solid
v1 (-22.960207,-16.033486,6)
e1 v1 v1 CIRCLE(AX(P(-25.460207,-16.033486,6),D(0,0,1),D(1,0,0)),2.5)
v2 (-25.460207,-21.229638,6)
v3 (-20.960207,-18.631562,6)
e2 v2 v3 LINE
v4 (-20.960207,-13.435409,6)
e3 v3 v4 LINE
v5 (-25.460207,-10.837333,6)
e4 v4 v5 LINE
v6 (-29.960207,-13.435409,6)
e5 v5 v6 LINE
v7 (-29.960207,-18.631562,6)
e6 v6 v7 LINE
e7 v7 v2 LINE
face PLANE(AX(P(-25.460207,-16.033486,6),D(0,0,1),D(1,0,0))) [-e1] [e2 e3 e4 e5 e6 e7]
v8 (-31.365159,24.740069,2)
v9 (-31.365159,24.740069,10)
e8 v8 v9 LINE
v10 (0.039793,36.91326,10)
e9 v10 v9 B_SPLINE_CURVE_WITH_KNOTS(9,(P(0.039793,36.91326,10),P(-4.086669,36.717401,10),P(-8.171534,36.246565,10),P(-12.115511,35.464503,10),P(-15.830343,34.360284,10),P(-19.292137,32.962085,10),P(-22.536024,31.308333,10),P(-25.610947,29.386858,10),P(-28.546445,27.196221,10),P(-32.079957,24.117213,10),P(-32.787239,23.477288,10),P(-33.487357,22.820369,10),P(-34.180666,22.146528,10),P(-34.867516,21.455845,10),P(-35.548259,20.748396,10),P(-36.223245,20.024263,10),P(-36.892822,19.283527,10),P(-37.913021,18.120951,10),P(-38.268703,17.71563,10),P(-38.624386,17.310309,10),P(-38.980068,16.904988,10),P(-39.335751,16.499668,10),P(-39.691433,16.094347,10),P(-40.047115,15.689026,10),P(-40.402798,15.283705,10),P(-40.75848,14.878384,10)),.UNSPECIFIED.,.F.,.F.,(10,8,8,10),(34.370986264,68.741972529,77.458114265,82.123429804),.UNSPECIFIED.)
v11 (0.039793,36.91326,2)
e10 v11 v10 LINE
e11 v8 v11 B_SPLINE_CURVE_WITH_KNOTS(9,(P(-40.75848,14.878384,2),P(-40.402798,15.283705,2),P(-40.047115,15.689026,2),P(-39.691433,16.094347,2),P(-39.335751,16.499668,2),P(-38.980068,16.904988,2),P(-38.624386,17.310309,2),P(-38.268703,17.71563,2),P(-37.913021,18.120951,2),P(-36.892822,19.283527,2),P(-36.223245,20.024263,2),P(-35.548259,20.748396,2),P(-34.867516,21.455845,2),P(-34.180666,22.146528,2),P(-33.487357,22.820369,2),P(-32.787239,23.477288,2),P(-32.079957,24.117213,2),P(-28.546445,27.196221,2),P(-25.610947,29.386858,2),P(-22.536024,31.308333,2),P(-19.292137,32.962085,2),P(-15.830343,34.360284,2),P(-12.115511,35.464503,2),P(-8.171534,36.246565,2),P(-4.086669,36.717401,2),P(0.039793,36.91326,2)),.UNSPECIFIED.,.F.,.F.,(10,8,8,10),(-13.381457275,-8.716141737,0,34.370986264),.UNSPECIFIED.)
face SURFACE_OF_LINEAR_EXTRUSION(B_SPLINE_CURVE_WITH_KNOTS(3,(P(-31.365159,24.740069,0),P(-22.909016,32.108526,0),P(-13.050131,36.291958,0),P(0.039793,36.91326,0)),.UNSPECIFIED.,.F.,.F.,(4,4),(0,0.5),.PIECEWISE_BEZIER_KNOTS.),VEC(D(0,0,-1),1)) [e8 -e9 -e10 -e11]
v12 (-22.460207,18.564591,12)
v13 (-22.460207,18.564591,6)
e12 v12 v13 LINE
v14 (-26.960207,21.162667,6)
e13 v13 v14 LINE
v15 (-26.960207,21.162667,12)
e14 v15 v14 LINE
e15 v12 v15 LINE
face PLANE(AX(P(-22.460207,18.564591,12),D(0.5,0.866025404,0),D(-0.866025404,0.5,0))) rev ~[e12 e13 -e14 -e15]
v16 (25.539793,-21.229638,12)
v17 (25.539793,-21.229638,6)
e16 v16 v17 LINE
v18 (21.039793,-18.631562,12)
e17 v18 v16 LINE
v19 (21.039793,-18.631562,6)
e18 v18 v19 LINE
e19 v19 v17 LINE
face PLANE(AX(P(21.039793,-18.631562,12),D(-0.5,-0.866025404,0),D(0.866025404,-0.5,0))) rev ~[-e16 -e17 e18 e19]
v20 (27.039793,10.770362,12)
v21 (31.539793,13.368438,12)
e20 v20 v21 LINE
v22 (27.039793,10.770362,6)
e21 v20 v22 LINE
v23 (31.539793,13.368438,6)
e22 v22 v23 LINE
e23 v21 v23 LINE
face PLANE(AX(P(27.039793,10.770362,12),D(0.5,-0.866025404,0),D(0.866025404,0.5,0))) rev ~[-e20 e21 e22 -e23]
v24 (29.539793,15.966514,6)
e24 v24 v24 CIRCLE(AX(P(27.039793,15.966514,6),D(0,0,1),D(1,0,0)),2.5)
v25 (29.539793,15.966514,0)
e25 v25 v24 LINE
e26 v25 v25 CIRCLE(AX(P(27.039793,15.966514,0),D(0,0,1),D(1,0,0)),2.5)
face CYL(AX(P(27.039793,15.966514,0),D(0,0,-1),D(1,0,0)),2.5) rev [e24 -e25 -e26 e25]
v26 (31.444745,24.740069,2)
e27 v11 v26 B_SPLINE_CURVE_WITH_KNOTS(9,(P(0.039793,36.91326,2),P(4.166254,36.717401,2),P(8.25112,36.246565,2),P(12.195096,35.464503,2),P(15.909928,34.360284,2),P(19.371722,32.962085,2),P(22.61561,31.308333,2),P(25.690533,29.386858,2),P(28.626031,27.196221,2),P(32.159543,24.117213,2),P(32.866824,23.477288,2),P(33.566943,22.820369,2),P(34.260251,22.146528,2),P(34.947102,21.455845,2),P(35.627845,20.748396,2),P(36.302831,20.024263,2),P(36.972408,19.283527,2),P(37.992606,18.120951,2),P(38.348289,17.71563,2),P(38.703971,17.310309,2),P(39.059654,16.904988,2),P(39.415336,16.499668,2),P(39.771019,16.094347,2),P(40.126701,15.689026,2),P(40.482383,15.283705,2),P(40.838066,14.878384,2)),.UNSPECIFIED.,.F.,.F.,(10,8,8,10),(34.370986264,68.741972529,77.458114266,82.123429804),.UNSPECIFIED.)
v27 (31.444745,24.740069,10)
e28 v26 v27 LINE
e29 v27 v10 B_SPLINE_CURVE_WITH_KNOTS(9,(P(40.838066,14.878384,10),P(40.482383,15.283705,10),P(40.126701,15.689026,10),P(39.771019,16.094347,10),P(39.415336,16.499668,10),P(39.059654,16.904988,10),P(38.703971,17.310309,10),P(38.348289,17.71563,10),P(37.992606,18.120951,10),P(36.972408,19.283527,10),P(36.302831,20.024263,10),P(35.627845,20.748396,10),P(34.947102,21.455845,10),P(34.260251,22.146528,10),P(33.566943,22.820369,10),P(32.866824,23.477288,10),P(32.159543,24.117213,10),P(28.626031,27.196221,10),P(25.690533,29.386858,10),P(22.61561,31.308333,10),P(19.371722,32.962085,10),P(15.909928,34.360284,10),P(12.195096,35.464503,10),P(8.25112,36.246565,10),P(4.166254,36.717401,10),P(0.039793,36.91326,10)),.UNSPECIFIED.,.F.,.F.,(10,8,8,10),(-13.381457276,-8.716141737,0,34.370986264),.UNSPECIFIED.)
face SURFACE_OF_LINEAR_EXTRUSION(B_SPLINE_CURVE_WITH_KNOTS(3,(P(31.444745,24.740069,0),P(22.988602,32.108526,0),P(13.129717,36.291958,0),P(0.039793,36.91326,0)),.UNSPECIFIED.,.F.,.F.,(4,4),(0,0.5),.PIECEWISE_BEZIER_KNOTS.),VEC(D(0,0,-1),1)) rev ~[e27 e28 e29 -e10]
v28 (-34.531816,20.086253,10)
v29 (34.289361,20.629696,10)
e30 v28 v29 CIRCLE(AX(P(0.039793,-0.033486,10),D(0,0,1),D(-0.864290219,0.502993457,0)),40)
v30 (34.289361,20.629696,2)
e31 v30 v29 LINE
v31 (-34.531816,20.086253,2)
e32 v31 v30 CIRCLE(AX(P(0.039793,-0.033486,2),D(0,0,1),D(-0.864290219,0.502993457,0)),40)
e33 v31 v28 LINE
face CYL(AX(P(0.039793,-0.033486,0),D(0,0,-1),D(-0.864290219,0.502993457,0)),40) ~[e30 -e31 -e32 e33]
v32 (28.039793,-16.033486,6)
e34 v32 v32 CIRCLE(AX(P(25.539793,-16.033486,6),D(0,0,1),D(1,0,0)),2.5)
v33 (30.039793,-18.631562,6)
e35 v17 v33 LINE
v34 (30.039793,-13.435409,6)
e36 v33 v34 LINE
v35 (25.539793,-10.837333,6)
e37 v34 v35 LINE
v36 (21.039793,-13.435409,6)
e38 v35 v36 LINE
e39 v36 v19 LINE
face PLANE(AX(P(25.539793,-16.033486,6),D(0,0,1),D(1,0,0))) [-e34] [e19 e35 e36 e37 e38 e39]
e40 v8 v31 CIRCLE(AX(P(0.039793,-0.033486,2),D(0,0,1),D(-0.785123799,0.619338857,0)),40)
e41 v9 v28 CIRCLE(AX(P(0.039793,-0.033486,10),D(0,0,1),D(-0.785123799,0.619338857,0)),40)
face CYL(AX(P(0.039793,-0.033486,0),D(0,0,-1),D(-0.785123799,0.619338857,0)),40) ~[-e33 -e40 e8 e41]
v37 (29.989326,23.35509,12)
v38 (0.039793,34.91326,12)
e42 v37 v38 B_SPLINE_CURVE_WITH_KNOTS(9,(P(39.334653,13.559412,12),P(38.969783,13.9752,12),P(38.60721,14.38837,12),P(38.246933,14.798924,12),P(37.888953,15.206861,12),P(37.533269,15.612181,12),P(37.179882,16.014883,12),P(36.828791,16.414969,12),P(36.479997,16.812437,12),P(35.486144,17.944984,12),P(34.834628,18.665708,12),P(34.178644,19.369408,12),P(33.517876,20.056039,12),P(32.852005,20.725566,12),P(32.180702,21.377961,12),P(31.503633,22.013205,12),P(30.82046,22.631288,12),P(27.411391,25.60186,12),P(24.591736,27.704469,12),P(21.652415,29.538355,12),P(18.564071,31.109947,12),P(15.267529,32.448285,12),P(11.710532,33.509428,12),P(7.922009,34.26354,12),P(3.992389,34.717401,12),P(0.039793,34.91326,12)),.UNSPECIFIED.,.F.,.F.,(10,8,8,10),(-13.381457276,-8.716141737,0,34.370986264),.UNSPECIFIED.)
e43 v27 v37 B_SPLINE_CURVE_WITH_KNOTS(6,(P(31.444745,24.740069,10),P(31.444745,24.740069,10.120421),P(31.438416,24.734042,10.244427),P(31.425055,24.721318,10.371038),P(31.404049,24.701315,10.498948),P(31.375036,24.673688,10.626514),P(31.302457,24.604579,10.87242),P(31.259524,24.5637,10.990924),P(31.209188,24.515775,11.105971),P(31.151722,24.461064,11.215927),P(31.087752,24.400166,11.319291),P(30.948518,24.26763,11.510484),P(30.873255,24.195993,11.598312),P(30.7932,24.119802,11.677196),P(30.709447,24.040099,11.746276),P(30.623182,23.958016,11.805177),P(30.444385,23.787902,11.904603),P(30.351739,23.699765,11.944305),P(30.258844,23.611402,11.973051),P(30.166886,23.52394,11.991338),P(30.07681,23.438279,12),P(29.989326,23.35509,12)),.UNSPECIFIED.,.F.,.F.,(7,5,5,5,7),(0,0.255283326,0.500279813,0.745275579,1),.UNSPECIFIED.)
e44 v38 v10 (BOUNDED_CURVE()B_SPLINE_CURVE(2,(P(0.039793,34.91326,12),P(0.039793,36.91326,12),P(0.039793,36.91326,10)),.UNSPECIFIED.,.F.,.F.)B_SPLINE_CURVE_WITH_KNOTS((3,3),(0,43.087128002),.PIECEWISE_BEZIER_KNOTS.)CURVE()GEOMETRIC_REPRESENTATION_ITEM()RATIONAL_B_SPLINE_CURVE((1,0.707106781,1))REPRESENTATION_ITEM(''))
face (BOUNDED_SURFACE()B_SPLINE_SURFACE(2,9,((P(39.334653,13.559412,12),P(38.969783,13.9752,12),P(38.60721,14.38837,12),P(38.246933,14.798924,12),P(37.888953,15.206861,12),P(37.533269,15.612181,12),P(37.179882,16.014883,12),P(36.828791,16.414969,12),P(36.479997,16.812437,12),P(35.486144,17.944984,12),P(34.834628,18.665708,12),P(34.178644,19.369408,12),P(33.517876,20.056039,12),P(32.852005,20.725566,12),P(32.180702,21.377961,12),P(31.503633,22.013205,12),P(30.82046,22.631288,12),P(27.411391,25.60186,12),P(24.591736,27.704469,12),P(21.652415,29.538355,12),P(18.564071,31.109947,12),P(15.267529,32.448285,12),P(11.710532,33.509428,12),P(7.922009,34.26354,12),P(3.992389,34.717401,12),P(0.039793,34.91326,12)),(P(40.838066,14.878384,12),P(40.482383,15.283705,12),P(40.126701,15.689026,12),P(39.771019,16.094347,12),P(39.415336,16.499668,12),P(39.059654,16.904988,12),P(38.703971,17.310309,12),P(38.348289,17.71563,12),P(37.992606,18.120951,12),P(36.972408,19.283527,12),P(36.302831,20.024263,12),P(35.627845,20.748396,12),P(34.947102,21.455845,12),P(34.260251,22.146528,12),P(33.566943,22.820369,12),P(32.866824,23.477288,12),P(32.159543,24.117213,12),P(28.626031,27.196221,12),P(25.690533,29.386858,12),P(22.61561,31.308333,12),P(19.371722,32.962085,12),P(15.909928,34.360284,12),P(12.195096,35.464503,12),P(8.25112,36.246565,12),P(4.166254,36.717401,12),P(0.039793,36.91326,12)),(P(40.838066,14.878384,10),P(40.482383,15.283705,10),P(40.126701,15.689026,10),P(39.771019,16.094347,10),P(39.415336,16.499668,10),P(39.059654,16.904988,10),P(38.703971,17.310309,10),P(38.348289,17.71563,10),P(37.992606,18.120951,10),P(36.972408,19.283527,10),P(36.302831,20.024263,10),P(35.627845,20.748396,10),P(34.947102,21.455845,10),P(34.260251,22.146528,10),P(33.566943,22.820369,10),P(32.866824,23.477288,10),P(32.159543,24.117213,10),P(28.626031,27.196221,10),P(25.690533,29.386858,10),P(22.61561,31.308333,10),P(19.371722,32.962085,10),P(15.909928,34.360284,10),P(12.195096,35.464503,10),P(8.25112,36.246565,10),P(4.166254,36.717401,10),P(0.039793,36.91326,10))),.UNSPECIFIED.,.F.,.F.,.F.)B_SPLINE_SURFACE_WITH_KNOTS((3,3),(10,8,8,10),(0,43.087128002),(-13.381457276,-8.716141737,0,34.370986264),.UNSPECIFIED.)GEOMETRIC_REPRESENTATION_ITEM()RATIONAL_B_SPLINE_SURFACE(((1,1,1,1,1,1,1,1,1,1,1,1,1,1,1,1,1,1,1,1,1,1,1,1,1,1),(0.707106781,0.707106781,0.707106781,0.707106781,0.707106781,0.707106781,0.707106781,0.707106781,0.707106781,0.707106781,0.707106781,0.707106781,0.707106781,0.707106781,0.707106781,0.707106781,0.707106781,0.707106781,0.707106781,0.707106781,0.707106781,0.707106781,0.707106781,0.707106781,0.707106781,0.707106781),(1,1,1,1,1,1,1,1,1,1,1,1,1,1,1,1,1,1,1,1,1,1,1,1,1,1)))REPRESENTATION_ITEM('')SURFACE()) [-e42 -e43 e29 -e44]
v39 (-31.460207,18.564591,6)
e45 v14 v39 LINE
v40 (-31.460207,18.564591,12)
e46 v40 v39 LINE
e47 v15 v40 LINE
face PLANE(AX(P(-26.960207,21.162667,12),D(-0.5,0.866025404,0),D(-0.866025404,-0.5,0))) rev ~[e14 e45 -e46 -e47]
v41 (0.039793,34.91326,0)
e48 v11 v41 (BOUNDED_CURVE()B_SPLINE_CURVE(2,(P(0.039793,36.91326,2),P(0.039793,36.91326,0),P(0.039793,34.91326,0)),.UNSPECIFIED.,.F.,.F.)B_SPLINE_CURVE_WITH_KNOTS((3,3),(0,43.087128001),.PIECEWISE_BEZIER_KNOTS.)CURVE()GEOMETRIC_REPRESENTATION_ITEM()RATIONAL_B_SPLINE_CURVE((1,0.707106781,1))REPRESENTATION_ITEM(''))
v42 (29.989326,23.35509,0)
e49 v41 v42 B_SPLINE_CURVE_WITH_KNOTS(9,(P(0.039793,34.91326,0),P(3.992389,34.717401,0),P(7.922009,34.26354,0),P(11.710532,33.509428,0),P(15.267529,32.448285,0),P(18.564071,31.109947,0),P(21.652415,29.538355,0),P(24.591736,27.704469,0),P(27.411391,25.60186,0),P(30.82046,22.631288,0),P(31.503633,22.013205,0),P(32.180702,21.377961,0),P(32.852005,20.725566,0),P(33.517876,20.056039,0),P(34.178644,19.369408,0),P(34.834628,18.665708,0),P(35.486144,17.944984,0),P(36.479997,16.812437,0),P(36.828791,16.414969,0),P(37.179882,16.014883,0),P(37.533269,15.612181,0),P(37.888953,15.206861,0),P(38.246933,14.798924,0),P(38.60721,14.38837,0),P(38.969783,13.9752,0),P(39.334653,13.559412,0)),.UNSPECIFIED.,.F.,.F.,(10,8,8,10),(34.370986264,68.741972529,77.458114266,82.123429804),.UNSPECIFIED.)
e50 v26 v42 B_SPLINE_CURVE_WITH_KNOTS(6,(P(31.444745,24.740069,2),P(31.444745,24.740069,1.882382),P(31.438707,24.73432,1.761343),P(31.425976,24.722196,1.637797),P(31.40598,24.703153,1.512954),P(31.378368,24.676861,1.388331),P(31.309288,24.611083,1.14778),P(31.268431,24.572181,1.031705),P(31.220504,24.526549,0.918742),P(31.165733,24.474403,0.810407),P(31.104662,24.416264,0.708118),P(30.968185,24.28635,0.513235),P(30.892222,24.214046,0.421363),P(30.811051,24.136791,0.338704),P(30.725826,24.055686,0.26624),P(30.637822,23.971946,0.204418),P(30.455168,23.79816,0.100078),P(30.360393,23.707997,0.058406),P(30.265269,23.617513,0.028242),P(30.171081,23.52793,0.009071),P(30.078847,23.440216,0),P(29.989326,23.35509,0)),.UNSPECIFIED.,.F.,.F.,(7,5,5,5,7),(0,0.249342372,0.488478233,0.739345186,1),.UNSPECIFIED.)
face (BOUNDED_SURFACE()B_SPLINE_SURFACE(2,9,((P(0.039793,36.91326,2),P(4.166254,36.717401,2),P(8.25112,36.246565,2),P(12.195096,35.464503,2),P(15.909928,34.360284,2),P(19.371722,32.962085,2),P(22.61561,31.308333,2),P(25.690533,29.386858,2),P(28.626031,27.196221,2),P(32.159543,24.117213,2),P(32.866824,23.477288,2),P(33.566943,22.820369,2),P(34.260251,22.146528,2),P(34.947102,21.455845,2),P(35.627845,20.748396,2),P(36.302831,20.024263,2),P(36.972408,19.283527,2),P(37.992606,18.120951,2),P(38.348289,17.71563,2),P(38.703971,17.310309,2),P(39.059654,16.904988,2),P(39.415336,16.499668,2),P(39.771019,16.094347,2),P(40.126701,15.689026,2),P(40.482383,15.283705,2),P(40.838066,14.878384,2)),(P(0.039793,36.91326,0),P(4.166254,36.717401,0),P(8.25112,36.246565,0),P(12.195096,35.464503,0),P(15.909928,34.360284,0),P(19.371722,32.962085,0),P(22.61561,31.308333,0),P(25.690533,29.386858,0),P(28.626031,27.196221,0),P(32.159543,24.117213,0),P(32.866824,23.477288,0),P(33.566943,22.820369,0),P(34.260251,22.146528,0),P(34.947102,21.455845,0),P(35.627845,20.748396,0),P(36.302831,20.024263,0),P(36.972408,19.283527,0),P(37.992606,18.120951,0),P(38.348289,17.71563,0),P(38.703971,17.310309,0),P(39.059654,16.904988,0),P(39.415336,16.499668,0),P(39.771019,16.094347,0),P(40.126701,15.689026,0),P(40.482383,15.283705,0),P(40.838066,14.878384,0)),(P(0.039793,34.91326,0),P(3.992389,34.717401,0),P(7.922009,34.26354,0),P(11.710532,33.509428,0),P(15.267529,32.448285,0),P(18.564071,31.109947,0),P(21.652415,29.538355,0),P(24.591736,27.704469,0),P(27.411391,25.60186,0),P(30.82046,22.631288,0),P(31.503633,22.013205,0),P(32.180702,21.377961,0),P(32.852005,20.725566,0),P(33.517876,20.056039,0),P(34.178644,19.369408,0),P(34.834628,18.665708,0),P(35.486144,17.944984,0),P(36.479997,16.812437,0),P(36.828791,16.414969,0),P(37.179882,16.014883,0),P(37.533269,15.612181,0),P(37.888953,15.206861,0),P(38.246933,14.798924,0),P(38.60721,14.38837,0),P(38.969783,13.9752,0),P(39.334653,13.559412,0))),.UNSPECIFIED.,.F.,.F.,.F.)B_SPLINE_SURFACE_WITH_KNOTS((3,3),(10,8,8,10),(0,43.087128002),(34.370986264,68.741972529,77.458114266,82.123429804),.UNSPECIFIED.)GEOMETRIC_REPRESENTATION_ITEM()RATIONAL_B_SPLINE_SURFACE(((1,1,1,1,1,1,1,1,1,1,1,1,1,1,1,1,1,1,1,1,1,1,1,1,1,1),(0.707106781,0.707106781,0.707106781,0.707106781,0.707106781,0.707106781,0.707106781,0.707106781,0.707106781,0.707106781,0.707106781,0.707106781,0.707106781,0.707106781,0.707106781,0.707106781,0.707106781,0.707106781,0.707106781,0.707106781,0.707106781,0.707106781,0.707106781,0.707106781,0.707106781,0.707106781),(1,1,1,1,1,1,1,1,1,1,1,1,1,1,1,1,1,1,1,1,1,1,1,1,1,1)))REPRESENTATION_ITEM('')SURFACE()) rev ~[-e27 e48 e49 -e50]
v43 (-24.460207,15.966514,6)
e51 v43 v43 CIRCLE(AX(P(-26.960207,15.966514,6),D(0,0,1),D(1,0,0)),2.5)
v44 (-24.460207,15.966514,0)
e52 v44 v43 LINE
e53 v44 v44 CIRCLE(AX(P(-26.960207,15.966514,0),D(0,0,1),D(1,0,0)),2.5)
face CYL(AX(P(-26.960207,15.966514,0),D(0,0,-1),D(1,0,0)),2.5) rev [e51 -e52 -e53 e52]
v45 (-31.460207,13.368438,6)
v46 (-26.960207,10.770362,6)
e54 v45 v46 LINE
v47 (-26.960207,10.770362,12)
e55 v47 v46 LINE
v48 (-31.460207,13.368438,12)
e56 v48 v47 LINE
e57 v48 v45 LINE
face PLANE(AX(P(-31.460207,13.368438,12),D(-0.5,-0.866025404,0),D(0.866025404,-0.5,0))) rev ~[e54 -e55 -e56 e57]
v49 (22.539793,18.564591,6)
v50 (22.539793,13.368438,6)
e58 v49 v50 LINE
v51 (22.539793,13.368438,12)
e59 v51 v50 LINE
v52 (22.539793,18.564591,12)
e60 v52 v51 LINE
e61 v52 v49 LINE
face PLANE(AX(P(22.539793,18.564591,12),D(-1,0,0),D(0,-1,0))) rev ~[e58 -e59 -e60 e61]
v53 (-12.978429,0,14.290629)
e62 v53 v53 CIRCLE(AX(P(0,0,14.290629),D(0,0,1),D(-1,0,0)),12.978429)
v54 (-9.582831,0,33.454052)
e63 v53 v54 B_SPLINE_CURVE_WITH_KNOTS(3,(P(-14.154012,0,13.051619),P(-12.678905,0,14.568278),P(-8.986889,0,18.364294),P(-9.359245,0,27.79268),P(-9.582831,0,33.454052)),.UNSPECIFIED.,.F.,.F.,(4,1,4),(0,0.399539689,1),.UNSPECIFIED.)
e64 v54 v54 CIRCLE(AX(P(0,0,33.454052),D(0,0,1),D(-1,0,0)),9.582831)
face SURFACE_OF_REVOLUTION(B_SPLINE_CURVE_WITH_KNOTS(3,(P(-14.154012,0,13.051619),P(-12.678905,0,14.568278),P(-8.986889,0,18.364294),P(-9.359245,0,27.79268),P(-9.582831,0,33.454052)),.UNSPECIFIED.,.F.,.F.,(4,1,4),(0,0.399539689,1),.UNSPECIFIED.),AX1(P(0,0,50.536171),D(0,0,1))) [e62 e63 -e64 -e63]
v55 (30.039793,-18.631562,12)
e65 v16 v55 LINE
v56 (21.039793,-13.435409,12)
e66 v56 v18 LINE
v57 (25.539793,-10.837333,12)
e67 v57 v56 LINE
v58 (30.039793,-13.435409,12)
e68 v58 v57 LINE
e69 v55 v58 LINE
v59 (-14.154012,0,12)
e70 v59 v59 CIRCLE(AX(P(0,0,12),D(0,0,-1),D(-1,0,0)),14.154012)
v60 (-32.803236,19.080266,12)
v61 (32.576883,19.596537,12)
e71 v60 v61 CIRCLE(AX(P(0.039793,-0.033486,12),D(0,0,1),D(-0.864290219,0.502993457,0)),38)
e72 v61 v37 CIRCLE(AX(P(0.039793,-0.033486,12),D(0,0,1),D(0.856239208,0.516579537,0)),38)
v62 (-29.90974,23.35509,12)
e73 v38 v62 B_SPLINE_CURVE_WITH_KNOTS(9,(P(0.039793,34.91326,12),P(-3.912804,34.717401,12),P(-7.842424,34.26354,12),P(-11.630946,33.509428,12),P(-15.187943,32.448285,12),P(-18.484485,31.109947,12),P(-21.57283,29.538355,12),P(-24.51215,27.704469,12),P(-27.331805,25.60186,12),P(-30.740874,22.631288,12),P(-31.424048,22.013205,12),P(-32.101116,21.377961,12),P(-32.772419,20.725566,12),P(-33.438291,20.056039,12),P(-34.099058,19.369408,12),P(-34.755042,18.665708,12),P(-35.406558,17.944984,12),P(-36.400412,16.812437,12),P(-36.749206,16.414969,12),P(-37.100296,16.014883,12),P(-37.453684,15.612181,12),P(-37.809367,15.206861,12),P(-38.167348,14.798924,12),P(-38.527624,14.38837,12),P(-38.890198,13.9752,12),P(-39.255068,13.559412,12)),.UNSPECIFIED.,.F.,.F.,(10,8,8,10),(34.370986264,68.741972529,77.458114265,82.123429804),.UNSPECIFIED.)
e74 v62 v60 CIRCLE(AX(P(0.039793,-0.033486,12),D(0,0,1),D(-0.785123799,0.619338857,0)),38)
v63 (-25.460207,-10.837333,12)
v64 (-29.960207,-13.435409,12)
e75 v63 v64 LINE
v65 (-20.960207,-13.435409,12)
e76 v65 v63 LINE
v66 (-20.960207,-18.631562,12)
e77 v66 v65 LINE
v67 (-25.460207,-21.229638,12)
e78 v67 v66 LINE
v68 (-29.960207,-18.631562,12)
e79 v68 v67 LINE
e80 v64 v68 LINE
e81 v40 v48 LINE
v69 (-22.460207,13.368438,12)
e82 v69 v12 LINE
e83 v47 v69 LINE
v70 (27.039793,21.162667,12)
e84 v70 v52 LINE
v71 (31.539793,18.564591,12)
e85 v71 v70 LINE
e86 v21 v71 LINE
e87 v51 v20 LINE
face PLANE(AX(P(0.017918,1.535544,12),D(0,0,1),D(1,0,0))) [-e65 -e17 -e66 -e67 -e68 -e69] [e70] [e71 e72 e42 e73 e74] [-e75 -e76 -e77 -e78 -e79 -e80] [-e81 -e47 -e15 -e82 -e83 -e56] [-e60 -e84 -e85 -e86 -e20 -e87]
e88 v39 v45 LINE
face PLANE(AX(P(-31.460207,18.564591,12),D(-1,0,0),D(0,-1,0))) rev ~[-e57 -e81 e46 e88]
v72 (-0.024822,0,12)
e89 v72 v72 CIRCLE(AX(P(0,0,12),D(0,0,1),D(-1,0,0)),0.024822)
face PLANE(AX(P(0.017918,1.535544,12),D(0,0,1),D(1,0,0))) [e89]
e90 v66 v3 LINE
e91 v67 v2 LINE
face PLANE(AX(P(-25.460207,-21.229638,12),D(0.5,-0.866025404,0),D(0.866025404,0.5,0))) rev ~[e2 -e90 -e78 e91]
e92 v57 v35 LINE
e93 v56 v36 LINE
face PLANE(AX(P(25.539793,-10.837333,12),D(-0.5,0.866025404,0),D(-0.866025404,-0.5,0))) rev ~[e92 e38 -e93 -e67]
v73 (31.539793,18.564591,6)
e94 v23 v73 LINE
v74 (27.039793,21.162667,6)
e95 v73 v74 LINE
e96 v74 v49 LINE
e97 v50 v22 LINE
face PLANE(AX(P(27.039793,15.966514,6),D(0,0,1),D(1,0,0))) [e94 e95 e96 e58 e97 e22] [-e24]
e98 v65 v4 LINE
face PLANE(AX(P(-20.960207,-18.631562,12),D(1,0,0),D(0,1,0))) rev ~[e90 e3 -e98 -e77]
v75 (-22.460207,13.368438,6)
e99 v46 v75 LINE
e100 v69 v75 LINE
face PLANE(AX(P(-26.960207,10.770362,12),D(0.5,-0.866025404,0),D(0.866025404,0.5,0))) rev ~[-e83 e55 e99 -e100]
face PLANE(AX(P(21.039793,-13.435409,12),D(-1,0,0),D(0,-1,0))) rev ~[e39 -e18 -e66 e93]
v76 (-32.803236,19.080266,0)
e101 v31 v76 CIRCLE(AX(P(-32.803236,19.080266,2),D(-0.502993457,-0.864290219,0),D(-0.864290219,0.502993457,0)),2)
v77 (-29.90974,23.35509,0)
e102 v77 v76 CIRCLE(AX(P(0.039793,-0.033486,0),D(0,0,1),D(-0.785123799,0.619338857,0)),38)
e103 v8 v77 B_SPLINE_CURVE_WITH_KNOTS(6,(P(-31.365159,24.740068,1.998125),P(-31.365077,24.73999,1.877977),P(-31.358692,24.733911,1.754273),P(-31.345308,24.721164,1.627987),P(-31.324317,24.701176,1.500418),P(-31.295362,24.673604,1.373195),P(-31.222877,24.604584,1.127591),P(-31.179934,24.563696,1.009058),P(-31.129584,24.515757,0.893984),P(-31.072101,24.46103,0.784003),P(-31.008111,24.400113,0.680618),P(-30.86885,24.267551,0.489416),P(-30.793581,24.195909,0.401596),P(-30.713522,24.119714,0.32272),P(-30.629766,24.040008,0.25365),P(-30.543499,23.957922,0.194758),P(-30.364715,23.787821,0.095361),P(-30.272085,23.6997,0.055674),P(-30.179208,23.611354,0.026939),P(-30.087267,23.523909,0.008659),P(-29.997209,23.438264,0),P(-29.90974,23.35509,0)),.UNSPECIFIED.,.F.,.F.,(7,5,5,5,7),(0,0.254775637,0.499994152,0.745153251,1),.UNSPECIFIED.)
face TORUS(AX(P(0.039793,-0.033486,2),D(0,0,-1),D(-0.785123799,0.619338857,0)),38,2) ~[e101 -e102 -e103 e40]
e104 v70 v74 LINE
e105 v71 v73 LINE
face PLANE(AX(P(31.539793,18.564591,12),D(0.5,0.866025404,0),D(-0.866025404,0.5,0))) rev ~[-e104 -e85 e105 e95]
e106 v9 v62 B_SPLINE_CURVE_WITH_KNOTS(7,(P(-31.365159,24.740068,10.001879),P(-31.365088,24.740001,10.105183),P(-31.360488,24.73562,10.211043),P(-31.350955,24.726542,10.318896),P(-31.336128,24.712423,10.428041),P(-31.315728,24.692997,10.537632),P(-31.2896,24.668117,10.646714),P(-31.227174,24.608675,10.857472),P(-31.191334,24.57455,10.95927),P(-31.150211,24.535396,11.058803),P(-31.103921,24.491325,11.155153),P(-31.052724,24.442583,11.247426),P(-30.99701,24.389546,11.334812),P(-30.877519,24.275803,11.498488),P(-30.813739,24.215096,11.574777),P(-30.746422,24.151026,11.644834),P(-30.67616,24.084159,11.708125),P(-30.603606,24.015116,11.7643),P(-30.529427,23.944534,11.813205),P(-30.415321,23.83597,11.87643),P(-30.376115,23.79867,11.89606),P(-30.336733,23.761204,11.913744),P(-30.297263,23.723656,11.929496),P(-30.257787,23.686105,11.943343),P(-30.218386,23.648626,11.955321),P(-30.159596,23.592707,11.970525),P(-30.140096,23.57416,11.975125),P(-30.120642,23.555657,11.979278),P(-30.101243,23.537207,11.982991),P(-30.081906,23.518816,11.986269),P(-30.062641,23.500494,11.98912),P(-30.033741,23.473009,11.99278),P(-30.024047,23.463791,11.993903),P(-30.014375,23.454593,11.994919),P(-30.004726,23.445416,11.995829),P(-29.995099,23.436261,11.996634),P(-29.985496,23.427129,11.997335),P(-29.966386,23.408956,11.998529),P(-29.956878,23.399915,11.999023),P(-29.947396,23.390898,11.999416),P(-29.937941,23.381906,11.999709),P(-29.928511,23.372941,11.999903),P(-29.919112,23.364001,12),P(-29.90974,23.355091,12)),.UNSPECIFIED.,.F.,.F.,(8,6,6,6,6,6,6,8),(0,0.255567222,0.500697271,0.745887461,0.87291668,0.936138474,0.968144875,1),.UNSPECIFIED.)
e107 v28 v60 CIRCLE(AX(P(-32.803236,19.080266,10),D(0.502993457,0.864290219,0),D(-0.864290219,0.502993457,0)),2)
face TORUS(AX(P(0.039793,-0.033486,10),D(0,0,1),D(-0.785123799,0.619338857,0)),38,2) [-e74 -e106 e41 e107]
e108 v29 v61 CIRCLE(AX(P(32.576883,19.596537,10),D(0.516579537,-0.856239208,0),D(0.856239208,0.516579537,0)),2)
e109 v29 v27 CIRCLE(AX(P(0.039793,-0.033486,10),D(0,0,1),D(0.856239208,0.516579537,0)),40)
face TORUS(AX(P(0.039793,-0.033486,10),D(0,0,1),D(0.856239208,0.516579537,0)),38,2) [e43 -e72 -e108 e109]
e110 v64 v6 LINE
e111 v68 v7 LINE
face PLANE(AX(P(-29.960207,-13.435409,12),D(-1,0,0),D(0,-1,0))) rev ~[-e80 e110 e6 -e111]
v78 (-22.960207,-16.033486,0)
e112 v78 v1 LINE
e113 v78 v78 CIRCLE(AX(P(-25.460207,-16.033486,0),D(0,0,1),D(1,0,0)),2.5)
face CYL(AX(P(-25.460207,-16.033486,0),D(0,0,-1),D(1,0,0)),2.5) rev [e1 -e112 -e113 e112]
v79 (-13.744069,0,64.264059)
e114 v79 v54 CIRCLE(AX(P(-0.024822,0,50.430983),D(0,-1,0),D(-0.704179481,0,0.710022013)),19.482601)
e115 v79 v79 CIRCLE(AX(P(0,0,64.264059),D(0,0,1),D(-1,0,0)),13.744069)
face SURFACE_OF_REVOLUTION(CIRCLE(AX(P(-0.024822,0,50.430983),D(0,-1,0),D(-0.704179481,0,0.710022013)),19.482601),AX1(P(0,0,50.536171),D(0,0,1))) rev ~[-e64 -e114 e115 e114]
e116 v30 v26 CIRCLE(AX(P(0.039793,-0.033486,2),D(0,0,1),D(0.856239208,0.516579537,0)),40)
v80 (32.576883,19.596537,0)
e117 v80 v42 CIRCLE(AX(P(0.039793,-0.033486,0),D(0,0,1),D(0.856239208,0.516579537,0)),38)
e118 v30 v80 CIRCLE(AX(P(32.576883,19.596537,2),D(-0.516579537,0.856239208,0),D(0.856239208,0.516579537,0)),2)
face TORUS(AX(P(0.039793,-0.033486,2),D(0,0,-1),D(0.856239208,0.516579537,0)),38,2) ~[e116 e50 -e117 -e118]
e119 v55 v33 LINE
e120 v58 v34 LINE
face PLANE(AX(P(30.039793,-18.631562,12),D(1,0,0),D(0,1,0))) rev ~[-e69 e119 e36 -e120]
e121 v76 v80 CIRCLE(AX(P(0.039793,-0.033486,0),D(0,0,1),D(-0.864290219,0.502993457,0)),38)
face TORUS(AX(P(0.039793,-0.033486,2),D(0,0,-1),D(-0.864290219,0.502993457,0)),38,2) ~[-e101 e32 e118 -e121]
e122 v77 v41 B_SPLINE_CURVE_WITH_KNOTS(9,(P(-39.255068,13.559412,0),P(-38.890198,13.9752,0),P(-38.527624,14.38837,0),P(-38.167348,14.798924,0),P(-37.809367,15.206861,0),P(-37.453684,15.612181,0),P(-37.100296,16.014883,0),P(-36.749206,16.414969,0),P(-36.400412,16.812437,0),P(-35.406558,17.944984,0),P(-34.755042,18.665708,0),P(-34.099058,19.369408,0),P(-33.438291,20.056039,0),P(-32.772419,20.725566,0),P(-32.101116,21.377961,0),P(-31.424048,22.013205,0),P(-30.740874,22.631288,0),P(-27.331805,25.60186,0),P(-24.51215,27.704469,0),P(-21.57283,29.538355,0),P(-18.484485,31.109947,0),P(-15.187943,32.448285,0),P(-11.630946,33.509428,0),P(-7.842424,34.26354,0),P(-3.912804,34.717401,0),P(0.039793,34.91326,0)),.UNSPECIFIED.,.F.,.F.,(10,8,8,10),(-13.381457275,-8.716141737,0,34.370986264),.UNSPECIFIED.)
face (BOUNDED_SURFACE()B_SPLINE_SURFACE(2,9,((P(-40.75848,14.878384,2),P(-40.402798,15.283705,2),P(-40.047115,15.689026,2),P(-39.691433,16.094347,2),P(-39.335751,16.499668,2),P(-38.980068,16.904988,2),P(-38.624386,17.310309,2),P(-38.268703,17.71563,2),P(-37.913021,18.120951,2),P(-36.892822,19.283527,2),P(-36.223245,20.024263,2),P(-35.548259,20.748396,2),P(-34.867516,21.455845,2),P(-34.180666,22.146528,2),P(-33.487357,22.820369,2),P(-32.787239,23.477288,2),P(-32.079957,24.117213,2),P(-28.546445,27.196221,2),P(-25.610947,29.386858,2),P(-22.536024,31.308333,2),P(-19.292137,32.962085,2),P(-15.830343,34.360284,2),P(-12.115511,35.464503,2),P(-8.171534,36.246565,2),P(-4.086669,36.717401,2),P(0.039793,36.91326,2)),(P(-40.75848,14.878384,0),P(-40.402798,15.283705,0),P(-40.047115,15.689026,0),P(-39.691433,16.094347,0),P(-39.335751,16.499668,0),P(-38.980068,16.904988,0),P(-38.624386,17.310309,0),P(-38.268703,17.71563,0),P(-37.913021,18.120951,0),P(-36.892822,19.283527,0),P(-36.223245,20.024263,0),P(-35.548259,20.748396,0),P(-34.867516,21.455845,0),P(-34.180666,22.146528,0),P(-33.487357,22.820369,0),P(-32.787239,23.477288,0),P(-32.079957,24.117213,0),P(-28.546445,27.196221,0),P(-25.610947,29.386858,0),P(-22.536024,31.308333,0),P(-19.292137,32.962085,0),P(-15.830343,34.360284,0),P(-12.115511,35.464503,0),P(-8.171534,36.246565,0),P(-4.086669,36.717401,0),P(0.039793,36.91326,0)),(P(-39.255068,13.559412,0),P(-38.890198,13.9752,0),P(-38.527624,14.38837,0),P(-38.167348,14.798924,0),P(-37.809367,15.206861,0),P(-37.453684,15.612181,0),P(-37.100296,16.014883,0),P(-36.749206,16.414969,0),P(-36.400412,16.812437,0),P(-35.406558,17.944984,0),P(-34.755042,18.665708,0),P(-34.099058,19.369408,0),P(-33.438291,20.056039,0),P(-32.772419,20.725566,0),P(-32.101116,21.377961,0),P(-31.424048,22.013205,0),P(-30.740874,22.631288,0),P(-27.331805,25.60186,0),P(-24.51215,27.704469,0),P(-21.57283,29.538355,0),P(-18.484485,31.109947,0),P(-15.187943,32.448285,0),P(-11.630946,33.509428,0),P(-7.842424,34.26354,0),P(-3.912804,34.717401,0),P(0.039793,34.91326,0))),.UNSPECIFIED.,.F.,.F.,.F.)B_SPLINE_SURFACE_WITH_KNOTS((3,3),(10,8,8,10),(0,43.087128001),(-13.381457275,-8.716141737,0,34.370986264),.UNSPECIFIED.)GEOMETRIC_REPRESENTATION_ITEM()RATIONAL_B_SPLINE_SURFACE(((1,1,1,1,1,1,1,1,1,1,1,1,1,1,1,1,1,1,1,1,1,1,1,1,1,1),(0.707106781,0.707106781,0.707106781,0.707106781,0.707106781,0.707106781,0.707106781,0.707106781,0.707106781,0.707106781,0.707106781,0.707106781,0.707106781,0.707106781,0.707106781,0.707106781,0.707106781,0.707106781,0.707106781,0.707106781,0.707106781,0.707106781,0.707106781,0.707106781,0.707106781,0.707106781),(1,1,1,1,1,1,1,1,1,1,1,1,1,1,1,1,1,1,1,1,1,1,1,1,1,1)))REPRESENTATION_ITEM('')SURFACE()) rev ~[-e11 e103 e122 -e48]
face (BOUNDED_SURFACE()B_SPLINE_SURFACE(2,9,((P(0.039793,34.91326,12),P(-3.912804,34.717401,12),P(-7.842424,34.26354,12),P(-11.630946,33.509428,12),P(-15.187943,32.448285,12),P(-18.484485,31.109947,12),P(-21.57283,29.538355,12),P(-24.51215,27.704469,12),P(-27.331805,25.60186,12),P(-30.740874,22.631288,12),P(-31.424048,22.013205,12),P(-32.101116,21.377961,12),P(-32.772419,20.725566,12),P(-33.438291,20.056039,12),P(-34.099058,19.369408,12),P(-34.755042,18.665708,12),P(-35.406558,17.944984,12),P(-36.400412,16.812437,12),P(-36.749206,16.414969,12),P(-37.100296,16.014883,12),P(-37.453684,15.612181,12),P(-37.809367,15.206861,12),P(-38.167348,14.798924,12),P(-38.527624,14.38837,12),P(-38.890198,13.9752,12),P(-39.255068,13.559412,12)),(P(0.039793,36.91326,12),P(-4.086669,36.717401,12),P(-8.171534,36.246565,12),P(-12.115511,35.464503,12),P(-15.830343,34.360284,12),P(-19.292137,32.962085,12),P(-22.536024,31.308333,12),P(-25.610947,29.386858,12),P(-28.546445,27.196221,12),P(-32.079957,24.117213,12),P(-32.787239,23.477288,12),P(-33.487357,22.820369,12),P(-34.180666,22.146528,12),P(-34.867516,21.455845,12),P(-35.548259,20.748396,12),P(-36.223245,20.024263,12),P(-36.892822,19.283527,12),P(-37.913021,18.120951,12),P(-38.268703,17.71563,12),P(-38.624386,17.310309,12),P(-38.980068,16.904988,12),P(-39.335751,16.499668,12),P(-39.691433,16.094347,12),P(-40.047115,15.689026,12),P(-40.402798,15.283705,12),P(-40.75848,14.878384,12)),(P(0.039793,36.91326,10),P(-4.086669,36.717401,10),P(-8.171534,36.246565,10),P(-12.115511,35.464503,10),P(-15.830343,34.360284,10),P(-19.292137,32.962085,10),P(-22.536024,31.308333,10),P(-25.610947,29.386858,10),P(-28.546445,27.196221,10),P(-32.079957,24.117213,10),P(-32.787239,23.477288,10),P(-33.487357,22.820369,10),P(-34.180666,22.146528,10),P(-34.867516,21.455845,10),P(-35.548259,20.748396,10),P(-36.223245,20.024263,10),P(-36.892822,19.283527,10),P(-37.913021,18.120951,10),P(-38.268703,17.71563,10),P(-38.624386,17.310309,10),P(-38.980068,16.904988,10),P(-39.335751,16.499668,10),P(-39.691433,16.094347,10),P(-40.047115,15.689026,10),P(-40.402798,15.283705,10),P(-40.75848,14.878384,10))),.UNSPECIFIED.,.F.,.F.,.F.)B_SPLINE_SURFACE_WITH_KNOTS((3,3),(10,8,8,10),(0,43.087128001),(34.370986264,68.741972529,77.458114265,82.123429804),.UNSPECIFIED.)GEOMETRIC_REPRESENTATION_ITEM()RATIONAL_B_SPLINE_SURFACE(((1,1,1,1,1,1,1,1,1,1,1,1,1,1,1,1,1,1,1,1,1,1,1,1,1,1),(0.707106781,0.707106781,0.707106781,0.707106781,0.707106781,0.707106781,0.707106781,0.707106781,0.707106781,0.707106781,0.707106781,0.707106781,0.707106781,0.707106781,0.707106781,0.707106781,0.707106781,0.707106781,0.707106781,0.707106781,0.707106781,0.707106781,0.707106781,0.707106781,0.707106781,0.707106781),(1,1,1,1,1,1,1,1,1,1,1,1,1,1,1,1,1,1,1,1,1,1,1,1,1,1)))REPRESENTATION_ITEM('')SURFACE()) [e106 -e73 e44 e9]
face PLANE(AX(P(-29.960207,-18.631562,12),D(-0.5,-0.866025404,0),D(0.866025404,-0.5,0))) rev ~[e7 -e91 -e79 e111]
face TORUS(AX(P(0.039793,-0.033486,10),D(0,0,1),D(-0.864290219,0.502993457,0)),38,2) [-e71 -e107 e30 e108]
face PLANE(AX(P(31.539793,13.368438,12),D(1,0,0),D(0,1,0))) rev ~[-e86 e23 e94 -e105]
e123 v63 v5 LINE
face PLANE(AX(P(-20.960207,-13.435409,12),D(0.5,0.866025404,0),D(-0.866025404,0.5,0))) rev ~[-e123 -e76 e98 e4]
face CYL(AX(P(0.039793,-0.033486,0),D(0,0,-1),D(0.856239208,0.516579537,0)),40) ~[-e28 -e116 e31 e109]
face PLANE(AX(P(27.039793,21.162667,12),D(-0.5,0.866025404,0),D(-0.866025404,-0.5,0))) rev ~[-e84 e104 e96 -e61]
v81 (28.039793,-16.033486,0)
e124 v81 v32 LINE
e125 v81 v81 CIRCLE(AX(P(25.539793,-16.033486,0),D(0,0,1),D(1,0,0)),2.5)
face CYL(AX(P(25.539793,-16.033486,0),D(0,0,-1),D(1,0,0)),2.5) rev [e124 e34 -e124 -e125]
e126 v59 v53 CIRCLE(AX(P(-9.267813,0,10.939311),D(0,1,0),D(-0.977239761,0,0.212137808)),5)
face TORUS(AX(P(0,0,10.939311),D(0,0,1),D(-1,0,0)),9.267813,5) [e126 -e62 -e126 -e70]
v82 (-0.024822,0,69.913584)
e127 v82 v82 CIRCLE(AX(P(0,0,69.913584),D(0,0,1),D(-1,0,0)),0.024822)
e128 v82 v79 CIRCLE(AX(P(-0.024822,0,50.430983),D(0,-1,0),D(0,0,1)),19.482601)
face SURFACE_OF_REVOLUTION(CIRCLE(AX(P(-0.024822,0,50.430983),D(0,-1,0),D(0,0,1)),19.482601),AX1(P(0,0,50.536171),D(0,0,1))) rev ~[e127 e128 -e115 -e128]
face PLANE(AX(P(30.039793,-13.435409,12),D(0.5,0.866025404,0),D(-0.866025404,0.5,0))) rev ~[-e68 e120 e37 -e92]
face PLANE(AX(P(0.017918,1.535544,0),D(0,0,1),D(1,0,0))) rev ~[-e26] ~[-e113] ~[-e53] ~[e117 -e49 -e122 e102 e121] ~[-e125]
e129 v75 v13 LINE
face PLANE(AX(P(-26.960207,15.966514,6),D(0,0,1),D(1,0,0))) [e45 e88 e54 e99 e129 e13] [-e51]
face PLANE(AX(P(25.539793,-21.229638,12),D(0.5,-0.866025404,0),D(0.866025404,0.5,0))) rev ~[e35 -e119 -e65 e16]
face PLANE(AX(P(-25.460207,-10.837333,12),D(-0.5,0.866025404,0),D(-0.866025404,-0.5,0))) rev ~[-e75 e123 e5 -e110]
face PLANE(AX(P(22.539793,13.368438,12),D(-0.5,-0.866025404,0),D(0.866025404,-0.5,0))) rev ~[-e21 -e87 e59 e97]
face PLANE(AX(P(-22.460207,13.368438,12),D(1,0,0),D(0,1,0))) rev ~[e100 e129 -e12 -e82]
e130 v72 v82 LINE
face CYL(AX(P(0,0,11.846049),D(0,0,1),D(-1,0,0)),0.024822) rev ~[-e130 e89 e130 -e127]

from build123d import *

# Parameters (mm, degrees)
F0_R     = 2.5
F1_DEPTH = 12
F3_R     = 2.5
F4_DEPTH = 6
F5_R     = 2


# Not quite as in the source:
# - a fillet or chamfer that OpenCascade refuses, or shapes differently, is made with other operations: its cross-section is extruded or revolved along the edge and cut away or added


with BuildPart() as f1:
    # F0 (on Top) → F1 (new body)
    with BuildSketch(Plane.XY):
        with BuildLine():
            ThreePointArc((-31.3651592039, 24.7400687451), (-33.0304528025, 22.4689333996), (-34.5318159842, 20.0862527403))
            ThreePointArc((-34.5318159842, 20.0862527403), (0.3556410553, -40.0322385106), (34.289361103, 20.6296959515))
            ThreePointArc((34.289361103, 20.6296959515), (32.9313235996, 22.7293613836), (31.4447447441, 24.7400687451))
            add(Edge.make_bspline(
                [(31.4447447441, 24.7400687451), (22.988602022, 32.1085255021), (13.1297165658, 36.2919575894), (0.0397927701, 36.9132596428)],
                knots=[0, 0, 0, 0, 0.5, 0.5, 0.5, 0.5], degree=3))
            add(Edge.make_bspline(
                [(-31.3651592039, 24.7400687451), (-22.9090164817, 32.1085255021), (-13.0501310255, 36.2919575894), (0.0397927701, 36.9132596428)],
                knots=[0, 0, 0, 0, 0.5, 0.5, 0.5, 0.5], degree=3))
        make_face()
        with Locations((-25.4602072299, -16.0334855318)):
            Circle(F0_R, mode=Mode.SUBTRACT)
        with Locations((25.5397927701, -16.0334855318)):
            Circle(F0_R, mode=Mode.SUBTRACT)
        with Locations((-26.9602072299, 15.9665144682)):
            Circle(F0_R, mode=Mode.SUBTRACT)
        with Locations((27.0397927701, 15.9665144682)):
            Circle(F0_R, mode=Mode.SUBTRACT)
    extrude(amount=F1_DEPTH)

    # F3 (on face) → F4 (cut)
    with BuildSketch(Plane.XY.offset(12)):
        Polygon((-22.4602072299, 13.3684382568), (-22.4602072299, 18.5645906795), (-26.9602072299, 21.1626668909), (-31.4602072299, 18.5645906795), (-31.4602072299, 13.3684382568), (-26.9602072299, 10.7703620455), align=None)
        with Locations((-26.9602072299, 15.9665144682)):
            Circle(F3_R, mode=Mode.SUBTRACT)
        Polygon((22.5397927701, 18.5645906795), (22.5397927701, 13.3684382568), (27.0397927701, 10.7703620455), (31.5397927701, 13.3684382568), (31.5397927701, 18.5645906795), (27.0397927701, 21.1626668909), align=None)
        with Locations((27.0397927701, 15.9665144682)):
            Circle(F3_R, mode=Mode.SUBTRACT)
        Polygon((21.0397927701, -13.4354093205), (21.0397927701, -18.6315617432), (25.5397927701, -21.2296379545), (30.0397927701, -18.6315617432), (30.0397927701, -13.4354093205), (25.5397927701, -10.8373331091), align=None)
        with Locations((25.5397927701, -16.0334855318)):
            Circle(F3_R, mode=Mode.SUBTRACT)
        Polygon((-20.9602072299, -18.6315617432), (-20.9602072299, -13.4354093205), (-25.4602072299, -10.8373331091), (-29.9602072299, -13.4354093205), (-29.9602072299, -18.6315617432), (-25.4602072299, -21.2296379545), align=None)
        with Locations((-25.4602072299, -16.0334855318)):
            Circle(F3_R, mode=Mode.SUBTRACT)
    extrude(amount=-F4_DEPTH, mode=Mode.SUBTRACT)

    # F5
    f5_edges = [f1.edges().sort_by_distance(p)[0] for p in [
        (-2.459557, -39.955325, 12),
        (-2.459557, -39.955325, 0),
        (16.831403, 33.608309, 12),
        (-16.751817, 33.608309, 12),
        (-16.751817, 33.608309, 0),
        (16.831403, 33.608309, 0),
    ]]
    fillet(f5_edges, radius=F5_R)

    # F6 (on Front) → F7 (revolve)
    with BuildSketch(Plane.XZ):
        with BuildLine():
            Line((-14.1540115437, 11.8460487906), (-0.0248217459, 11.8460487906))
            Line((-0.0248217459, 11.8460487906), (-0.0248217459, 12.5021283307))
            Line((-0.0248217459, 12.5021283307), (-0.0248217459, 25.1048319042))
            Line((-0.0248217459, 25.1048319042), (-0.0248217459, 58.8260033315))
            Line((-0.0248217459, 58.8260033315), (-0.0248217459, 64.264058532))
            Line((-0.0248217459, 64.264058532), (-0.0248217459, 69.9135838276))
            ThreePointArc((-0.0248217459, 69.9135838276), (-7.4432934465, 68.4459215755), (-13.744069299, 64.264058532))
            ThreePointArc((-13.744069299, 64.264058532), (-19.3321206406, 47.8233148814), (-9.582830593, 33.4540520906))
            add(Edge.make_bspline(
                [(-14.1540115437, 13.0516188551), (-12.6789047108, 14.5682779679), (-8.9868889419, 18.3642941178), (-9.359245349, 27.7926803584), (-9.582830593, 33.4540520906)],
                knots=[0, 0, 0, 0, 0.3995396892, 1, 1, 1, 1], degree=3))
            Line((-14.1540115437, 13.0516188551), (-14.1540115437, 11.8460487906))
        make_face()
    revolve(axis=Axis((0, 0, 50.5361706018), (0, 0, 1)))

    # F8: fillet of radius 5 on 1 edges, made by hand

    # F8_s1 → F8_t2 (revolve, cut)
    with BuildSketch(Plane.XZ):
        with BuildLine():
            ThreePointArc((-14.1540115437, 12), (-13.716188898, 13.2222804174), (-12.9784286022, 14.2906285974))
            Line((-12.9784286022, 14.2906285974), (-13.0526409195, 14.3576549502))
            ThreePointArc((-13.0526409195, 14.3576549502), (-13.6328295807, 13.7347113697), (-14.2256974002, 13.1213407167))
            Line((-14.2256974002, 13.1213407167), (-14.2540115437, 13.0516188551))
            ThreePointArc((-14.2540115437, 13.0516188551), (-14.2540115437, 12.5258094276), (-14.2517355198, 12.0212137808))
            Line((-14.2517355198, 12.0212137808), (-14.1540115437, 12))
        make_face()
    revolve(axis=Axis((0, 0, 13.0516188551), (0, 0, 1)), mode=Mode.SUBTRACT)


solid = f1.part
